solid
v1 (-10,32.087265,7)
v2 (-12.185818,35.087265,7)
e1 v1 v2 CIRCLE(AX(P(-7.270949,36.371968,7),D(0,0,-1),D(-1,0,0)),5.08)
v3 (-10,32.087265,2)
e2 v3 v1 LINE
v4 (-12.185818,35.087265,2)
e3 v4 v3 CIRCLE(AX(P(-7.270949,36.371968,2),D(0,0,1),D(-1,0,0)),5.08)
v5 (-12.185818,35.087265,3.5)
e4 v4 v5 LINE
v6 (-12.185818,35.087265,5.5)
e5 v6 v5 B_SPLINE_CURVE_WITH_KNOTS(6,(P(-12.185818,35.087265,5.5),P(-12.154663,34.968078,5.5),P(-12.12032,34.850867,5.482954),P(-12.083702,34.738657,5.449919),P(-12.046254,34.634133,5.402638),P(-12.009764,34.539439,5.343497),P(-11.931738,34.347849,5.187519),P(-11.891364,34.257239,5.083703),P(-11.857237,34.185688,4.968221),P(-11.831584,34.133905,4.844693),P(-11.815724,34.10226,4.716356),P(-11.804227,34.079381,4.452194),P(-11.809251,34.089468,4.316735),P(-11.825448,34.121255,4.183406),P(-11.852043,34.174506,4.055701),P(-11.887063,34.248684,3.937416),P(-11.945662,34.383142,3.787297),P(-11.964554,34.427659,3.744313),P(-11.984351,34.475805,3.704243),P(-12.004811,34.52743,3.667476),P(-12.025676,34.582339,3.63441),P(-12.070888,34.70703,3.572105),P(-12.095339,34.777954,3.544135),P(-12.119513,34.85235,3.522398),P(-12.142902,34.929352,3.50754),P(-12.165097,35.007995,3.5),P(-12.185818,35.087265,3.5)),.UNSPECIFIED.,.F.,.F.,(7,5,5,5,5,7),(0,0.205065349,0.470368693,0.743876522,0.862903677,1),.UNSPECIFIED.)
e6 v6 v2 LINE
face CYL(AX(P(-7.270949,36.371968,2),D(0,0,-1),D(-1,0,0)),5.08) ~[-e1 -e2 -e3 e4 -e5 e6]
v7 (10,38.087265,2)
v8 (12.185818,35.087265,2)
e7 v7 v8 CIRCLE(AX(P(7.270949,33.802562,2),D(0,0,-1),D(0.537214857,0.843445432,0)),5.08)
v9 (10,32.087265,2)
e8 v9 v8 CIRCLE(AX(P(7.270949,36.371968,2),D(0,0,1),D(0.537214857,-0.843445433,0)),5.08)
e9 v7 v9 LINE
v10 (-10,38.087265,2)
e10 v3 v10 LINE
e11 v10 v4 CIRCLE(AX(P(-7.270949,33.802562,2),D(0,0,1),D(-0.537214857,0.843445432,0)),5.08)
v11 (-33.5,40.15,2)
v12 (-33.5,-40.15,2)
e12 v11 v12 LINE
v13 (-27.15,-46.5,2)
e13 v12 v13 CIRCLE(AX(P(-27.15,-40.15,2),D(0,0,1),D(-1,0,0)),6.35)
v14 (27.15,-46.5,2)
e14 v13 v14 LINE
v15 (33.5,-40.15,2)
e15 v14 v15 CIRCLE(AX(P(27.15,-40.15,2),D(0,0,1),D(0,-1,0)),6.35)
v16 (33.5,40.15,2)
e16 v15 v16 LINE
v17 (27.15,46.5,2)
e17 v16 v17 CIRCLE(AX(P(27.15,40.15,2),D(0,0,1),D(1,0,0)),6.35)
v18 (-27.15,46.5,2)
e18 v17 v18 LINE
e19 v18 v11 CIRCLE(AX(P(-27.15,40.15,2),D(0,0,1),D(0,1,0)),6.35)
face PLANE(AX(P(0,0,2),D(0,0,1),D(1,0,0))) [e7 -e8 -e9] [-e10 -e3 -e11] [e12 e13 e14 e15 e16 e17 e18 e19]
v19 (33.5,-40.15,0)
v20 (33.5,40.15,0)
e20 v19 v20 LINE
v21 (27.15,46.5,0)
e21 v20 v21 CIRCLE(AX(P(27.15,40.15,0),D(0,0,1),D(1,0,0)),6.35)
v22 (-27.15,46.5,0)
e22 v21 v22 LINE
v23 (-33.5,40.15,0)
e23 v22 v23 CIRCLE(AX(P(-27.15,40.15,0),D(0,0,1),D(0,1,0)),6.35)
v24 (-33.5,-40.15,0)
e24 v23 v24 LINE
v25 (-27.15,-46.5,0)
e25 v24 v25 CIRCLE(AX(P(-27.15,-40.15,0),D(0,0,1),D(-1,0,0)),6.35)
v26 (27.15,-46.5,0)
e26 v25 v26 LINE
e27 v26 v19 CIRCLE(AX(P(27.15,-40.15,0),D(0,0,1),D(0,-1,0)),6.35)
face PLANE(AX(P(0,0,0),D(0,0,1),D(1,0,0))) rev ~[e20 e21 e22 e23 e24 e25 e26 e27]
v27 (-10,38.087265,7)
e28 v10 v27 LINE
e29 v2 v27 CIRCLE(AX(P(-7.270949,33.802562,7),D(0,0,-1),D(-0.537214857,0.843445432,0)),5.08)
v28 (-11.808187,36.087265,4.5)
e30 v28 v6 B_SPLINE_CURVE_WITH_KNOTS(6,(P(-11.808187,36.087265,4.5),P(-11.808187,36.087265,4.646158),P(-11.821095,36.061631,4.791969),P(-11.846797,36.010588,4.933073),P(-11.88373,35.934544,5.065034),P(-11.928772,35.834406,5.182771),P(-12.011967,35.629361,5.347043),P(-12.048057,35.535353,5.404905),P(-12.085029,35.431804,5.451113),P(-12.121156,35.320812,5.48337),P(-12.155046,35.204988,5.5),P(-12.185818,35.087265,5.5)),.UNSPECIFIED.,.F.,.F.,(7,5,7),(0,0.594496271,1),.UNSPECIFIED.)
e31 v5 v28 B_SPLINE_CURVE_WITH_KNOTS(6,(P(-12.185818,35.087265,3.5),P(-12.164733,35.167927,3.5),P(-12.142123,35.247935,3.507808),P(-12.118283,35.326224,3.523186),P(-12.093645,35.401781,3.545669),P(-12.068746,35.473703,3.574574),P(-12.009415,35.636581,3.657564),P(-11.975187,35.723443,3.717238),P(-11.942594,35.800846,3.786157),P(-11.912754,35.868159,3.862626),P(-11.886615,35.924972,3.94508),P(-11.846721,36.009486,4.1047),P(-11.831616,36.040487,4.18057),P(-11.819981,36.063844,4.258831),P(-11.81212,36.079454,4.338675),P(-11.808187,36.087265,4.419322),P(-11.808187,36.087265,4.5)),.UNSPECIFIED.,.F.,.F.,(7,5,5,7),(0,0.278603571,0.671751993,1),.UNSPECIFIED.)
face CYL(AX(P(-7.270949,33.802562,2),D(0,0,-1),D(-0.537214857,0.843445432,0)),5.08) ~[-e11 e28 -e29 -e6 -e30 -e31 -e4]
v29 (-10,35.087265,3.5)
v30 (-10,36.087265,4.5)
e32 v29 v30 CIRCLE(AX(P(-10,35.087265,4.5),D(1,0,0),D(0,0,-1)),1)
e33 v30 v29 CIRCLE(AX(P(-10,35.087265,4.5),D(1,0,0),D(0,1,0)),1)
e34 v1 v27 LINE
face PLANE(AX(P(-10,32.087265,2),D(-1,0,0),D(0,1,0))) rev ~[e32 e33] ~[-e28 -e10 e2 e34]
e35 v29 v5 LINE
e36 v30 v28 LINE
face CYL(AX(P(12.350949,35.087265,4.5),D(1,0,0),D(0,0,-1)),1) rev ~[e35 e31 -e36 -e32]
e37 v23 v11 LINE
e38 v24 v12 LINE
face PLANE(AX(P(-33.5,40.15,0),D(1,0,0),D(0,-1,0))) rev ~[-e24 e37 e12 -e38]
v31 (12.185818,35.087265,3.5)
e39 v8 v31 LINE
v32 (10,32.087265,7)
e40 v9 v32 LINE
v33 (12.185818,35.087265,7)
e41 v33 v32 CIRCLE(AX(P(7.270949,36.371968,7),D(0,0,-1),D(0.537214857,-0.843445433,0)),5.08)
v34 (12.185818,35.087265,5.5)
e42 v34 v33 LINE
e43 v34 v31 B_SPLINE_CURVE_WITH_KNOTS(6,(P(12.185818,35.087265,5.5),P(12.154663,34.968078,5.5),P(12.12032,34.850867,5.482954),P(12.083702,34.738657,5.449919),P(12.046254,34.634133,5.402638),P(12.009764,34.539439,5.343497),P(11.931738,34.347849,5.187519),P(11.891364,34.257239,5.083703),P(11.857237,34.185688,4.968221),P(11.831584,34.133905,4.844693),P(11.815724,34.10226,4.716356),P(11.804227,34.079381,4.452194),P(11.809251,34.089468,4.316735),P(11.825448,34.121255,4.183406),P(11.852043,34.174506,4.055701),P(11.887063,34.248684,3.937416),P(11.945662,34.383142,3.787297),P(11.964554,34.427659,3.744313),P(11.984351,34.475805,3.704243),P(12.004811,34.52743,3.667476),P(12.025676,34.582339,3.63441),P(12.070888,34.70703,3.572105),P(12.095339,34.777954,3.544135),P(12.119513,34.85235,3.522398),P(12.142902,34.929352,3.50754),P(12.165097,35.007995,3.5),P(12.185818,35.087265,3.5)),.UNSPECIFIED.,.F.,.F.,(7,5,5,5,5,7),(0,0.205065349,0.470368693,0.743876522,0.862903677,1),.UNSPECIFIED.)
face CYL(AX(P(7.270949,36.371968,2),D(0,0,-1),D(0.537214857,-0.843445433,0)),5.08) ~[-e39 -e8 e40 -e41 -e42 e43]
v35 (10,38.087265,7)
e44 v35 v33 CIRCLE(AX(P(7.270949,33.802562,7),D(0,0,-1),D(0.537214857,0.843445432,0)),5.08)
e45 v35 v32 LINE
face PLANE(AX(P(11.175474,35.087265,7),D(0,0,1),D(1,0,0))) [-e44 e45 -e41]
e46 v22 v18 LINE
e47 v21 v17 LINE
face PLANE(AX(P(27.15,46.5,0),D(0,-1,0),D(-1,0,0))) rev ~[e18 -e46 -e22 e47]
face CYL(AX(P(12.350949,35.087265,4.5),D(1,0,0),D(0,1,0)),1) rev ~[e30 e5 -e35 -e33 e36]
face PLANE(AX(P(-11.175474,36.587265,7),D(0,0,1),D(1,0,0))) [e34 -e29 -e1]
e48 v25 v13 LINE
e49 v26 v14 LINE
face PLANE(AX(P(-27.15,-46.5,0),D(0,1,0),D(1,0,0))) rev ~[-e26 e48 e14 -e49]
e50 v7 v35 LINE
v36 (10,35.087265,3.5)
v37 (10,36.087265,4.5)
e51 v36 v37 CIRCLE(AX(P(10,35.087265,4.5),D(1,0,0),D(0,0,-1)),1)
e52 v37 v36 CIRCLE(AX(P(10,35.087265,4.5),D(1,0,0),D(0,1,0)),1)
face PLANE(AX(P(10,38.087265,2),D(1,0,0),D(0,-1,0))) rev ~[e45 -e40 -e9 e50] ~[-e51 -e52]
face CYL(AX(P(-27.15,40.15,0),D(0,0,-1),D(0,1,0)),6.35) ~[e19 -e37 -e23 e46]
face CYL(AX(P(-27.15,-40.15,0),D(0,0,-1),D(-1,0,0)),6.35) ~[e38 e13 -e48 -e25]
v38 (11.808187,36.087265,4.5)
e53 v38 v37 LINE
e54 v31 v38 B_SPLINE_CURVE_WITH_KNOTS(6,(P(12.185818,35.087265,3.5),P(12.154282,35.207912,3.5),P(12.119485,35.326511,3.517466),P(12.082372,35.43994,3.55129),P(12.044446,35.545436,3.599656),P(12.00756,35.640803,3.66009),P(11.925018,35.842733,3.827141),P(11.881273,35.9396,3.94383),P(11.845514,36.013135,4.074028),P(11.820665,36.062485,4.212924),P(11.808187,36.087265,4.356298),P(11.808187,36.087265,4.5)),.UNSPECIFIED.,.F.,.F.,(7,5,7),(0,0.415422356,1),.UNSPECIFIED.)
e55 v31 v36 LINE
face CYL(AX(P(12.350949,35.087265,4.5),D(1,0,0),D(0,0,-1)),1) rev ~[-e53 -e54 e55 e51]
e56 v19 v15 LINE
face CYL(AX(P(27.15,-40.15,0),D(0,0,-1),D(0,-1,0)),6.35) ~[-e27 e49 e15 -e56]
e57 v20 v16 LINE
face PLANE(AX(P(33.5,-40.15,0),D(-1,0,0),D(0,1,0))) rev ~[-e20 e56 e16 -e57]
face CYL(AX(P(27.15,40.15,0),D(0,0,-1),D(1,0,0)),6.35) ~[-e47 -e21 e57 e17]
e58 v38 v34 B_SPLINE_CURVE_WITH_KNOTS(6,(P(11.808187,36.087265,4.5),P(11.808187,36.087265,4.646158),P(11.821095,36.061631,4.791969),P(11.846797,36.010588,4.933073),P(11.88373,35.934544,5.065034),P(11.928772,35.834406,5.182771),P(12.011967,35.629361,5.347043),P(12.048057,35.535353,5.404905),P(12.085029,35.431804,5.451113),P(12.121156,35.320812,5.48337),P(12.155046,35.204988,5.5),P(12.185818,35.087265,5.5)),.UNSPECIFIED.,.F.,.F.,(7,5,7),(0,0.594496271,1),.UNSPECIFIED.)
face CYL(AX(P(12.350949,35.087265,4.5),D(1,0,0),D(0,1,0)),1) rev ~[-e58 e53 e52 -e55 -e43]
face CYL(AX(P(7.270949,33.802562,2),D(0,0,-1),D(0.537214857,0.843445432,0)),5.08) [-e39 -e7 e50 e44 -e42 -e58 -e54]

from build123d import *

# Parameters (mm, degrees)
F1_DEPTH    = 2
F3_DEPTH    = 5
F6_DEPTH    = 25.4
F7_T1_DEPTH = 15.711756993


# Not quite as in the source:
# - a fillet or chamfer that OpenCascade refuses, or shapes differently, is made with other operations: its cross-section is extruded or revolved along the edge and cut away or added


with BuildPart() as f1:
    # F0 (on Top) → F1 (new body)
    with BuildSketch(Plane.XY):
        with BuildLine():
            Line((27.15, 46.5), (-27.15, 46.5))
            ThreePointArc((-27.15, 46.5), (-31.6401280605, 44.6401280605), (-33.5, 40.15))
            Line((-33.5, 40.15), (-33.5, -40.15))
            ThreePointArc((-33.5, -40.15), (-31.6401280605, -44.6401280605), (-27.15, -46.5))
            Line((-27.15, -46.5), (27.15, -46.5))
            ThreePointArc((27.15, -46.5), (31.6401280605, -44.6401280605), (33.5, -40.15))
            Line((33.5, -40.15), (33.5, 40.15))
            ThreePointArc((33.5, 40.15), (31.6401280605, 44.6401280605), (27.15, 46.5))
        make_face()
    extrude(amount=F1_DEPTH)

    # F2 (on face) → F3 (join)
    with BuildSketch(Plane.XY.offset(2)):
        Polygon((-11.4712007344, 35.0872650743), (-10, 35.0872650743), (-10, 38.0872650743), (-12.3509485275, 38.0872650743), (-12.3509485275, 35.0872650743), align=None)
        Polygon((-10, 32.0872650743), (-10, 35.0872650743), (-11.4712007344, 35.0872650743), (-12.3509485275, 35.0872650743), (-12.3509485275, 32.0872650743), align=None)
        Polygon((10, 38.0872650743), (10, 35.0872650743), (10, 32.0872650743), (12.3509485275, 32.0872650743), (12.3509485275, 35.0872650743), (12.3509485275, 38.0872650743), align=None)
    extrude(amount=F3_DEPTH)

    # F5 (on face) + F4 (on face) → F6 (cut)
    with BuildSketch(Plane.YZ.offset(12.3509485275)):
        with BuildLine():
            ThreePointArc((36.0872650743, 4.5), (34.3801582931, 5.2071067812), (35.0872650743, 3.5))
            ThreePointArc((35.0872650743, 3.5), (35.7943718554, 3.7928932188), (36.0872650743, 4.5))
        make_face()
    with BuildSketch(Plane(origin=(-12.3509485275, 0, 0), x_dir=(0, -1, 0), z_dir=(-1, 0, 0))):
        with BuildLine():
            ThreePointArc((-34.0872650743, 4.5), (-35.7943718554, 5.2071067812), (-35.0872650743, 3.5))
            ThreePointArc((-35.0872650743, 3.5), (-34.3801582931, 3.7928932188), (-34.0872650743, 4.5))
        make_face()
    extrude(amount=-F6_DEPTH, dir=(1, 0, 0), mode=Mode.SUBTRACT)

    # F7: fillet of radius 5.08 on 4 edges, made by hand

    # F7_s2 → F7_t1 (cut)
    with BuildSketch(Plane.XY.offset(2)):
        with BuildLine():
            ThreePointArc((-12.3509485275, 36.3719678714), (-11.7245976762, 33.9283211581), (-10, 32.0872650743))
            Line((-10, 32.0872650743), (-12.3509485275, 32.0872650743))
            Line((-12.3509485275, 32.0872650743), (-12.3509485275, 36.3719678714))
        make_face()
        with BuildLine():
            ThreePointArc((-10, 38.0872650743), (-11.7245976762, 36.2462089904), (-12.3509485275, 33.8025622771))
            Line((-12.3509485275, 33.8025622771), (-12.3509485275, 38.0872650743))
            Line((-12.3509485275, 38.0872650743), (-10, 38.0872650743))
        make_face()
        with BuildLine():
            ThreePointArc((10, 32.0872650743), (11.7245976762, 33.9283211581), (12.3509485275, 36.3719678714))
            Line((12.3509485275, 36.3719678714), (12.3509485275, 32.0872650743))
            Line((12.3509485275, 32.0872650743), (10, 32.0872650743))
        make_face()
        with BuildLine():
            ThreePointArc((10, 38.0872650743), (11.7245976762, 36.2462089904), (12.3509485275, 33.8025622771))
            Line((12.3509485275, 33.8025622771), (12.3509485275, 38.0872650743))
            Line((12.3509485275, 38.0872650743), (10, 38.0872650743))
        make_face()
    extrude(amount=F7_T1_DEPTH, mode=Mode.SUBTRACT)


solid = f1.part
